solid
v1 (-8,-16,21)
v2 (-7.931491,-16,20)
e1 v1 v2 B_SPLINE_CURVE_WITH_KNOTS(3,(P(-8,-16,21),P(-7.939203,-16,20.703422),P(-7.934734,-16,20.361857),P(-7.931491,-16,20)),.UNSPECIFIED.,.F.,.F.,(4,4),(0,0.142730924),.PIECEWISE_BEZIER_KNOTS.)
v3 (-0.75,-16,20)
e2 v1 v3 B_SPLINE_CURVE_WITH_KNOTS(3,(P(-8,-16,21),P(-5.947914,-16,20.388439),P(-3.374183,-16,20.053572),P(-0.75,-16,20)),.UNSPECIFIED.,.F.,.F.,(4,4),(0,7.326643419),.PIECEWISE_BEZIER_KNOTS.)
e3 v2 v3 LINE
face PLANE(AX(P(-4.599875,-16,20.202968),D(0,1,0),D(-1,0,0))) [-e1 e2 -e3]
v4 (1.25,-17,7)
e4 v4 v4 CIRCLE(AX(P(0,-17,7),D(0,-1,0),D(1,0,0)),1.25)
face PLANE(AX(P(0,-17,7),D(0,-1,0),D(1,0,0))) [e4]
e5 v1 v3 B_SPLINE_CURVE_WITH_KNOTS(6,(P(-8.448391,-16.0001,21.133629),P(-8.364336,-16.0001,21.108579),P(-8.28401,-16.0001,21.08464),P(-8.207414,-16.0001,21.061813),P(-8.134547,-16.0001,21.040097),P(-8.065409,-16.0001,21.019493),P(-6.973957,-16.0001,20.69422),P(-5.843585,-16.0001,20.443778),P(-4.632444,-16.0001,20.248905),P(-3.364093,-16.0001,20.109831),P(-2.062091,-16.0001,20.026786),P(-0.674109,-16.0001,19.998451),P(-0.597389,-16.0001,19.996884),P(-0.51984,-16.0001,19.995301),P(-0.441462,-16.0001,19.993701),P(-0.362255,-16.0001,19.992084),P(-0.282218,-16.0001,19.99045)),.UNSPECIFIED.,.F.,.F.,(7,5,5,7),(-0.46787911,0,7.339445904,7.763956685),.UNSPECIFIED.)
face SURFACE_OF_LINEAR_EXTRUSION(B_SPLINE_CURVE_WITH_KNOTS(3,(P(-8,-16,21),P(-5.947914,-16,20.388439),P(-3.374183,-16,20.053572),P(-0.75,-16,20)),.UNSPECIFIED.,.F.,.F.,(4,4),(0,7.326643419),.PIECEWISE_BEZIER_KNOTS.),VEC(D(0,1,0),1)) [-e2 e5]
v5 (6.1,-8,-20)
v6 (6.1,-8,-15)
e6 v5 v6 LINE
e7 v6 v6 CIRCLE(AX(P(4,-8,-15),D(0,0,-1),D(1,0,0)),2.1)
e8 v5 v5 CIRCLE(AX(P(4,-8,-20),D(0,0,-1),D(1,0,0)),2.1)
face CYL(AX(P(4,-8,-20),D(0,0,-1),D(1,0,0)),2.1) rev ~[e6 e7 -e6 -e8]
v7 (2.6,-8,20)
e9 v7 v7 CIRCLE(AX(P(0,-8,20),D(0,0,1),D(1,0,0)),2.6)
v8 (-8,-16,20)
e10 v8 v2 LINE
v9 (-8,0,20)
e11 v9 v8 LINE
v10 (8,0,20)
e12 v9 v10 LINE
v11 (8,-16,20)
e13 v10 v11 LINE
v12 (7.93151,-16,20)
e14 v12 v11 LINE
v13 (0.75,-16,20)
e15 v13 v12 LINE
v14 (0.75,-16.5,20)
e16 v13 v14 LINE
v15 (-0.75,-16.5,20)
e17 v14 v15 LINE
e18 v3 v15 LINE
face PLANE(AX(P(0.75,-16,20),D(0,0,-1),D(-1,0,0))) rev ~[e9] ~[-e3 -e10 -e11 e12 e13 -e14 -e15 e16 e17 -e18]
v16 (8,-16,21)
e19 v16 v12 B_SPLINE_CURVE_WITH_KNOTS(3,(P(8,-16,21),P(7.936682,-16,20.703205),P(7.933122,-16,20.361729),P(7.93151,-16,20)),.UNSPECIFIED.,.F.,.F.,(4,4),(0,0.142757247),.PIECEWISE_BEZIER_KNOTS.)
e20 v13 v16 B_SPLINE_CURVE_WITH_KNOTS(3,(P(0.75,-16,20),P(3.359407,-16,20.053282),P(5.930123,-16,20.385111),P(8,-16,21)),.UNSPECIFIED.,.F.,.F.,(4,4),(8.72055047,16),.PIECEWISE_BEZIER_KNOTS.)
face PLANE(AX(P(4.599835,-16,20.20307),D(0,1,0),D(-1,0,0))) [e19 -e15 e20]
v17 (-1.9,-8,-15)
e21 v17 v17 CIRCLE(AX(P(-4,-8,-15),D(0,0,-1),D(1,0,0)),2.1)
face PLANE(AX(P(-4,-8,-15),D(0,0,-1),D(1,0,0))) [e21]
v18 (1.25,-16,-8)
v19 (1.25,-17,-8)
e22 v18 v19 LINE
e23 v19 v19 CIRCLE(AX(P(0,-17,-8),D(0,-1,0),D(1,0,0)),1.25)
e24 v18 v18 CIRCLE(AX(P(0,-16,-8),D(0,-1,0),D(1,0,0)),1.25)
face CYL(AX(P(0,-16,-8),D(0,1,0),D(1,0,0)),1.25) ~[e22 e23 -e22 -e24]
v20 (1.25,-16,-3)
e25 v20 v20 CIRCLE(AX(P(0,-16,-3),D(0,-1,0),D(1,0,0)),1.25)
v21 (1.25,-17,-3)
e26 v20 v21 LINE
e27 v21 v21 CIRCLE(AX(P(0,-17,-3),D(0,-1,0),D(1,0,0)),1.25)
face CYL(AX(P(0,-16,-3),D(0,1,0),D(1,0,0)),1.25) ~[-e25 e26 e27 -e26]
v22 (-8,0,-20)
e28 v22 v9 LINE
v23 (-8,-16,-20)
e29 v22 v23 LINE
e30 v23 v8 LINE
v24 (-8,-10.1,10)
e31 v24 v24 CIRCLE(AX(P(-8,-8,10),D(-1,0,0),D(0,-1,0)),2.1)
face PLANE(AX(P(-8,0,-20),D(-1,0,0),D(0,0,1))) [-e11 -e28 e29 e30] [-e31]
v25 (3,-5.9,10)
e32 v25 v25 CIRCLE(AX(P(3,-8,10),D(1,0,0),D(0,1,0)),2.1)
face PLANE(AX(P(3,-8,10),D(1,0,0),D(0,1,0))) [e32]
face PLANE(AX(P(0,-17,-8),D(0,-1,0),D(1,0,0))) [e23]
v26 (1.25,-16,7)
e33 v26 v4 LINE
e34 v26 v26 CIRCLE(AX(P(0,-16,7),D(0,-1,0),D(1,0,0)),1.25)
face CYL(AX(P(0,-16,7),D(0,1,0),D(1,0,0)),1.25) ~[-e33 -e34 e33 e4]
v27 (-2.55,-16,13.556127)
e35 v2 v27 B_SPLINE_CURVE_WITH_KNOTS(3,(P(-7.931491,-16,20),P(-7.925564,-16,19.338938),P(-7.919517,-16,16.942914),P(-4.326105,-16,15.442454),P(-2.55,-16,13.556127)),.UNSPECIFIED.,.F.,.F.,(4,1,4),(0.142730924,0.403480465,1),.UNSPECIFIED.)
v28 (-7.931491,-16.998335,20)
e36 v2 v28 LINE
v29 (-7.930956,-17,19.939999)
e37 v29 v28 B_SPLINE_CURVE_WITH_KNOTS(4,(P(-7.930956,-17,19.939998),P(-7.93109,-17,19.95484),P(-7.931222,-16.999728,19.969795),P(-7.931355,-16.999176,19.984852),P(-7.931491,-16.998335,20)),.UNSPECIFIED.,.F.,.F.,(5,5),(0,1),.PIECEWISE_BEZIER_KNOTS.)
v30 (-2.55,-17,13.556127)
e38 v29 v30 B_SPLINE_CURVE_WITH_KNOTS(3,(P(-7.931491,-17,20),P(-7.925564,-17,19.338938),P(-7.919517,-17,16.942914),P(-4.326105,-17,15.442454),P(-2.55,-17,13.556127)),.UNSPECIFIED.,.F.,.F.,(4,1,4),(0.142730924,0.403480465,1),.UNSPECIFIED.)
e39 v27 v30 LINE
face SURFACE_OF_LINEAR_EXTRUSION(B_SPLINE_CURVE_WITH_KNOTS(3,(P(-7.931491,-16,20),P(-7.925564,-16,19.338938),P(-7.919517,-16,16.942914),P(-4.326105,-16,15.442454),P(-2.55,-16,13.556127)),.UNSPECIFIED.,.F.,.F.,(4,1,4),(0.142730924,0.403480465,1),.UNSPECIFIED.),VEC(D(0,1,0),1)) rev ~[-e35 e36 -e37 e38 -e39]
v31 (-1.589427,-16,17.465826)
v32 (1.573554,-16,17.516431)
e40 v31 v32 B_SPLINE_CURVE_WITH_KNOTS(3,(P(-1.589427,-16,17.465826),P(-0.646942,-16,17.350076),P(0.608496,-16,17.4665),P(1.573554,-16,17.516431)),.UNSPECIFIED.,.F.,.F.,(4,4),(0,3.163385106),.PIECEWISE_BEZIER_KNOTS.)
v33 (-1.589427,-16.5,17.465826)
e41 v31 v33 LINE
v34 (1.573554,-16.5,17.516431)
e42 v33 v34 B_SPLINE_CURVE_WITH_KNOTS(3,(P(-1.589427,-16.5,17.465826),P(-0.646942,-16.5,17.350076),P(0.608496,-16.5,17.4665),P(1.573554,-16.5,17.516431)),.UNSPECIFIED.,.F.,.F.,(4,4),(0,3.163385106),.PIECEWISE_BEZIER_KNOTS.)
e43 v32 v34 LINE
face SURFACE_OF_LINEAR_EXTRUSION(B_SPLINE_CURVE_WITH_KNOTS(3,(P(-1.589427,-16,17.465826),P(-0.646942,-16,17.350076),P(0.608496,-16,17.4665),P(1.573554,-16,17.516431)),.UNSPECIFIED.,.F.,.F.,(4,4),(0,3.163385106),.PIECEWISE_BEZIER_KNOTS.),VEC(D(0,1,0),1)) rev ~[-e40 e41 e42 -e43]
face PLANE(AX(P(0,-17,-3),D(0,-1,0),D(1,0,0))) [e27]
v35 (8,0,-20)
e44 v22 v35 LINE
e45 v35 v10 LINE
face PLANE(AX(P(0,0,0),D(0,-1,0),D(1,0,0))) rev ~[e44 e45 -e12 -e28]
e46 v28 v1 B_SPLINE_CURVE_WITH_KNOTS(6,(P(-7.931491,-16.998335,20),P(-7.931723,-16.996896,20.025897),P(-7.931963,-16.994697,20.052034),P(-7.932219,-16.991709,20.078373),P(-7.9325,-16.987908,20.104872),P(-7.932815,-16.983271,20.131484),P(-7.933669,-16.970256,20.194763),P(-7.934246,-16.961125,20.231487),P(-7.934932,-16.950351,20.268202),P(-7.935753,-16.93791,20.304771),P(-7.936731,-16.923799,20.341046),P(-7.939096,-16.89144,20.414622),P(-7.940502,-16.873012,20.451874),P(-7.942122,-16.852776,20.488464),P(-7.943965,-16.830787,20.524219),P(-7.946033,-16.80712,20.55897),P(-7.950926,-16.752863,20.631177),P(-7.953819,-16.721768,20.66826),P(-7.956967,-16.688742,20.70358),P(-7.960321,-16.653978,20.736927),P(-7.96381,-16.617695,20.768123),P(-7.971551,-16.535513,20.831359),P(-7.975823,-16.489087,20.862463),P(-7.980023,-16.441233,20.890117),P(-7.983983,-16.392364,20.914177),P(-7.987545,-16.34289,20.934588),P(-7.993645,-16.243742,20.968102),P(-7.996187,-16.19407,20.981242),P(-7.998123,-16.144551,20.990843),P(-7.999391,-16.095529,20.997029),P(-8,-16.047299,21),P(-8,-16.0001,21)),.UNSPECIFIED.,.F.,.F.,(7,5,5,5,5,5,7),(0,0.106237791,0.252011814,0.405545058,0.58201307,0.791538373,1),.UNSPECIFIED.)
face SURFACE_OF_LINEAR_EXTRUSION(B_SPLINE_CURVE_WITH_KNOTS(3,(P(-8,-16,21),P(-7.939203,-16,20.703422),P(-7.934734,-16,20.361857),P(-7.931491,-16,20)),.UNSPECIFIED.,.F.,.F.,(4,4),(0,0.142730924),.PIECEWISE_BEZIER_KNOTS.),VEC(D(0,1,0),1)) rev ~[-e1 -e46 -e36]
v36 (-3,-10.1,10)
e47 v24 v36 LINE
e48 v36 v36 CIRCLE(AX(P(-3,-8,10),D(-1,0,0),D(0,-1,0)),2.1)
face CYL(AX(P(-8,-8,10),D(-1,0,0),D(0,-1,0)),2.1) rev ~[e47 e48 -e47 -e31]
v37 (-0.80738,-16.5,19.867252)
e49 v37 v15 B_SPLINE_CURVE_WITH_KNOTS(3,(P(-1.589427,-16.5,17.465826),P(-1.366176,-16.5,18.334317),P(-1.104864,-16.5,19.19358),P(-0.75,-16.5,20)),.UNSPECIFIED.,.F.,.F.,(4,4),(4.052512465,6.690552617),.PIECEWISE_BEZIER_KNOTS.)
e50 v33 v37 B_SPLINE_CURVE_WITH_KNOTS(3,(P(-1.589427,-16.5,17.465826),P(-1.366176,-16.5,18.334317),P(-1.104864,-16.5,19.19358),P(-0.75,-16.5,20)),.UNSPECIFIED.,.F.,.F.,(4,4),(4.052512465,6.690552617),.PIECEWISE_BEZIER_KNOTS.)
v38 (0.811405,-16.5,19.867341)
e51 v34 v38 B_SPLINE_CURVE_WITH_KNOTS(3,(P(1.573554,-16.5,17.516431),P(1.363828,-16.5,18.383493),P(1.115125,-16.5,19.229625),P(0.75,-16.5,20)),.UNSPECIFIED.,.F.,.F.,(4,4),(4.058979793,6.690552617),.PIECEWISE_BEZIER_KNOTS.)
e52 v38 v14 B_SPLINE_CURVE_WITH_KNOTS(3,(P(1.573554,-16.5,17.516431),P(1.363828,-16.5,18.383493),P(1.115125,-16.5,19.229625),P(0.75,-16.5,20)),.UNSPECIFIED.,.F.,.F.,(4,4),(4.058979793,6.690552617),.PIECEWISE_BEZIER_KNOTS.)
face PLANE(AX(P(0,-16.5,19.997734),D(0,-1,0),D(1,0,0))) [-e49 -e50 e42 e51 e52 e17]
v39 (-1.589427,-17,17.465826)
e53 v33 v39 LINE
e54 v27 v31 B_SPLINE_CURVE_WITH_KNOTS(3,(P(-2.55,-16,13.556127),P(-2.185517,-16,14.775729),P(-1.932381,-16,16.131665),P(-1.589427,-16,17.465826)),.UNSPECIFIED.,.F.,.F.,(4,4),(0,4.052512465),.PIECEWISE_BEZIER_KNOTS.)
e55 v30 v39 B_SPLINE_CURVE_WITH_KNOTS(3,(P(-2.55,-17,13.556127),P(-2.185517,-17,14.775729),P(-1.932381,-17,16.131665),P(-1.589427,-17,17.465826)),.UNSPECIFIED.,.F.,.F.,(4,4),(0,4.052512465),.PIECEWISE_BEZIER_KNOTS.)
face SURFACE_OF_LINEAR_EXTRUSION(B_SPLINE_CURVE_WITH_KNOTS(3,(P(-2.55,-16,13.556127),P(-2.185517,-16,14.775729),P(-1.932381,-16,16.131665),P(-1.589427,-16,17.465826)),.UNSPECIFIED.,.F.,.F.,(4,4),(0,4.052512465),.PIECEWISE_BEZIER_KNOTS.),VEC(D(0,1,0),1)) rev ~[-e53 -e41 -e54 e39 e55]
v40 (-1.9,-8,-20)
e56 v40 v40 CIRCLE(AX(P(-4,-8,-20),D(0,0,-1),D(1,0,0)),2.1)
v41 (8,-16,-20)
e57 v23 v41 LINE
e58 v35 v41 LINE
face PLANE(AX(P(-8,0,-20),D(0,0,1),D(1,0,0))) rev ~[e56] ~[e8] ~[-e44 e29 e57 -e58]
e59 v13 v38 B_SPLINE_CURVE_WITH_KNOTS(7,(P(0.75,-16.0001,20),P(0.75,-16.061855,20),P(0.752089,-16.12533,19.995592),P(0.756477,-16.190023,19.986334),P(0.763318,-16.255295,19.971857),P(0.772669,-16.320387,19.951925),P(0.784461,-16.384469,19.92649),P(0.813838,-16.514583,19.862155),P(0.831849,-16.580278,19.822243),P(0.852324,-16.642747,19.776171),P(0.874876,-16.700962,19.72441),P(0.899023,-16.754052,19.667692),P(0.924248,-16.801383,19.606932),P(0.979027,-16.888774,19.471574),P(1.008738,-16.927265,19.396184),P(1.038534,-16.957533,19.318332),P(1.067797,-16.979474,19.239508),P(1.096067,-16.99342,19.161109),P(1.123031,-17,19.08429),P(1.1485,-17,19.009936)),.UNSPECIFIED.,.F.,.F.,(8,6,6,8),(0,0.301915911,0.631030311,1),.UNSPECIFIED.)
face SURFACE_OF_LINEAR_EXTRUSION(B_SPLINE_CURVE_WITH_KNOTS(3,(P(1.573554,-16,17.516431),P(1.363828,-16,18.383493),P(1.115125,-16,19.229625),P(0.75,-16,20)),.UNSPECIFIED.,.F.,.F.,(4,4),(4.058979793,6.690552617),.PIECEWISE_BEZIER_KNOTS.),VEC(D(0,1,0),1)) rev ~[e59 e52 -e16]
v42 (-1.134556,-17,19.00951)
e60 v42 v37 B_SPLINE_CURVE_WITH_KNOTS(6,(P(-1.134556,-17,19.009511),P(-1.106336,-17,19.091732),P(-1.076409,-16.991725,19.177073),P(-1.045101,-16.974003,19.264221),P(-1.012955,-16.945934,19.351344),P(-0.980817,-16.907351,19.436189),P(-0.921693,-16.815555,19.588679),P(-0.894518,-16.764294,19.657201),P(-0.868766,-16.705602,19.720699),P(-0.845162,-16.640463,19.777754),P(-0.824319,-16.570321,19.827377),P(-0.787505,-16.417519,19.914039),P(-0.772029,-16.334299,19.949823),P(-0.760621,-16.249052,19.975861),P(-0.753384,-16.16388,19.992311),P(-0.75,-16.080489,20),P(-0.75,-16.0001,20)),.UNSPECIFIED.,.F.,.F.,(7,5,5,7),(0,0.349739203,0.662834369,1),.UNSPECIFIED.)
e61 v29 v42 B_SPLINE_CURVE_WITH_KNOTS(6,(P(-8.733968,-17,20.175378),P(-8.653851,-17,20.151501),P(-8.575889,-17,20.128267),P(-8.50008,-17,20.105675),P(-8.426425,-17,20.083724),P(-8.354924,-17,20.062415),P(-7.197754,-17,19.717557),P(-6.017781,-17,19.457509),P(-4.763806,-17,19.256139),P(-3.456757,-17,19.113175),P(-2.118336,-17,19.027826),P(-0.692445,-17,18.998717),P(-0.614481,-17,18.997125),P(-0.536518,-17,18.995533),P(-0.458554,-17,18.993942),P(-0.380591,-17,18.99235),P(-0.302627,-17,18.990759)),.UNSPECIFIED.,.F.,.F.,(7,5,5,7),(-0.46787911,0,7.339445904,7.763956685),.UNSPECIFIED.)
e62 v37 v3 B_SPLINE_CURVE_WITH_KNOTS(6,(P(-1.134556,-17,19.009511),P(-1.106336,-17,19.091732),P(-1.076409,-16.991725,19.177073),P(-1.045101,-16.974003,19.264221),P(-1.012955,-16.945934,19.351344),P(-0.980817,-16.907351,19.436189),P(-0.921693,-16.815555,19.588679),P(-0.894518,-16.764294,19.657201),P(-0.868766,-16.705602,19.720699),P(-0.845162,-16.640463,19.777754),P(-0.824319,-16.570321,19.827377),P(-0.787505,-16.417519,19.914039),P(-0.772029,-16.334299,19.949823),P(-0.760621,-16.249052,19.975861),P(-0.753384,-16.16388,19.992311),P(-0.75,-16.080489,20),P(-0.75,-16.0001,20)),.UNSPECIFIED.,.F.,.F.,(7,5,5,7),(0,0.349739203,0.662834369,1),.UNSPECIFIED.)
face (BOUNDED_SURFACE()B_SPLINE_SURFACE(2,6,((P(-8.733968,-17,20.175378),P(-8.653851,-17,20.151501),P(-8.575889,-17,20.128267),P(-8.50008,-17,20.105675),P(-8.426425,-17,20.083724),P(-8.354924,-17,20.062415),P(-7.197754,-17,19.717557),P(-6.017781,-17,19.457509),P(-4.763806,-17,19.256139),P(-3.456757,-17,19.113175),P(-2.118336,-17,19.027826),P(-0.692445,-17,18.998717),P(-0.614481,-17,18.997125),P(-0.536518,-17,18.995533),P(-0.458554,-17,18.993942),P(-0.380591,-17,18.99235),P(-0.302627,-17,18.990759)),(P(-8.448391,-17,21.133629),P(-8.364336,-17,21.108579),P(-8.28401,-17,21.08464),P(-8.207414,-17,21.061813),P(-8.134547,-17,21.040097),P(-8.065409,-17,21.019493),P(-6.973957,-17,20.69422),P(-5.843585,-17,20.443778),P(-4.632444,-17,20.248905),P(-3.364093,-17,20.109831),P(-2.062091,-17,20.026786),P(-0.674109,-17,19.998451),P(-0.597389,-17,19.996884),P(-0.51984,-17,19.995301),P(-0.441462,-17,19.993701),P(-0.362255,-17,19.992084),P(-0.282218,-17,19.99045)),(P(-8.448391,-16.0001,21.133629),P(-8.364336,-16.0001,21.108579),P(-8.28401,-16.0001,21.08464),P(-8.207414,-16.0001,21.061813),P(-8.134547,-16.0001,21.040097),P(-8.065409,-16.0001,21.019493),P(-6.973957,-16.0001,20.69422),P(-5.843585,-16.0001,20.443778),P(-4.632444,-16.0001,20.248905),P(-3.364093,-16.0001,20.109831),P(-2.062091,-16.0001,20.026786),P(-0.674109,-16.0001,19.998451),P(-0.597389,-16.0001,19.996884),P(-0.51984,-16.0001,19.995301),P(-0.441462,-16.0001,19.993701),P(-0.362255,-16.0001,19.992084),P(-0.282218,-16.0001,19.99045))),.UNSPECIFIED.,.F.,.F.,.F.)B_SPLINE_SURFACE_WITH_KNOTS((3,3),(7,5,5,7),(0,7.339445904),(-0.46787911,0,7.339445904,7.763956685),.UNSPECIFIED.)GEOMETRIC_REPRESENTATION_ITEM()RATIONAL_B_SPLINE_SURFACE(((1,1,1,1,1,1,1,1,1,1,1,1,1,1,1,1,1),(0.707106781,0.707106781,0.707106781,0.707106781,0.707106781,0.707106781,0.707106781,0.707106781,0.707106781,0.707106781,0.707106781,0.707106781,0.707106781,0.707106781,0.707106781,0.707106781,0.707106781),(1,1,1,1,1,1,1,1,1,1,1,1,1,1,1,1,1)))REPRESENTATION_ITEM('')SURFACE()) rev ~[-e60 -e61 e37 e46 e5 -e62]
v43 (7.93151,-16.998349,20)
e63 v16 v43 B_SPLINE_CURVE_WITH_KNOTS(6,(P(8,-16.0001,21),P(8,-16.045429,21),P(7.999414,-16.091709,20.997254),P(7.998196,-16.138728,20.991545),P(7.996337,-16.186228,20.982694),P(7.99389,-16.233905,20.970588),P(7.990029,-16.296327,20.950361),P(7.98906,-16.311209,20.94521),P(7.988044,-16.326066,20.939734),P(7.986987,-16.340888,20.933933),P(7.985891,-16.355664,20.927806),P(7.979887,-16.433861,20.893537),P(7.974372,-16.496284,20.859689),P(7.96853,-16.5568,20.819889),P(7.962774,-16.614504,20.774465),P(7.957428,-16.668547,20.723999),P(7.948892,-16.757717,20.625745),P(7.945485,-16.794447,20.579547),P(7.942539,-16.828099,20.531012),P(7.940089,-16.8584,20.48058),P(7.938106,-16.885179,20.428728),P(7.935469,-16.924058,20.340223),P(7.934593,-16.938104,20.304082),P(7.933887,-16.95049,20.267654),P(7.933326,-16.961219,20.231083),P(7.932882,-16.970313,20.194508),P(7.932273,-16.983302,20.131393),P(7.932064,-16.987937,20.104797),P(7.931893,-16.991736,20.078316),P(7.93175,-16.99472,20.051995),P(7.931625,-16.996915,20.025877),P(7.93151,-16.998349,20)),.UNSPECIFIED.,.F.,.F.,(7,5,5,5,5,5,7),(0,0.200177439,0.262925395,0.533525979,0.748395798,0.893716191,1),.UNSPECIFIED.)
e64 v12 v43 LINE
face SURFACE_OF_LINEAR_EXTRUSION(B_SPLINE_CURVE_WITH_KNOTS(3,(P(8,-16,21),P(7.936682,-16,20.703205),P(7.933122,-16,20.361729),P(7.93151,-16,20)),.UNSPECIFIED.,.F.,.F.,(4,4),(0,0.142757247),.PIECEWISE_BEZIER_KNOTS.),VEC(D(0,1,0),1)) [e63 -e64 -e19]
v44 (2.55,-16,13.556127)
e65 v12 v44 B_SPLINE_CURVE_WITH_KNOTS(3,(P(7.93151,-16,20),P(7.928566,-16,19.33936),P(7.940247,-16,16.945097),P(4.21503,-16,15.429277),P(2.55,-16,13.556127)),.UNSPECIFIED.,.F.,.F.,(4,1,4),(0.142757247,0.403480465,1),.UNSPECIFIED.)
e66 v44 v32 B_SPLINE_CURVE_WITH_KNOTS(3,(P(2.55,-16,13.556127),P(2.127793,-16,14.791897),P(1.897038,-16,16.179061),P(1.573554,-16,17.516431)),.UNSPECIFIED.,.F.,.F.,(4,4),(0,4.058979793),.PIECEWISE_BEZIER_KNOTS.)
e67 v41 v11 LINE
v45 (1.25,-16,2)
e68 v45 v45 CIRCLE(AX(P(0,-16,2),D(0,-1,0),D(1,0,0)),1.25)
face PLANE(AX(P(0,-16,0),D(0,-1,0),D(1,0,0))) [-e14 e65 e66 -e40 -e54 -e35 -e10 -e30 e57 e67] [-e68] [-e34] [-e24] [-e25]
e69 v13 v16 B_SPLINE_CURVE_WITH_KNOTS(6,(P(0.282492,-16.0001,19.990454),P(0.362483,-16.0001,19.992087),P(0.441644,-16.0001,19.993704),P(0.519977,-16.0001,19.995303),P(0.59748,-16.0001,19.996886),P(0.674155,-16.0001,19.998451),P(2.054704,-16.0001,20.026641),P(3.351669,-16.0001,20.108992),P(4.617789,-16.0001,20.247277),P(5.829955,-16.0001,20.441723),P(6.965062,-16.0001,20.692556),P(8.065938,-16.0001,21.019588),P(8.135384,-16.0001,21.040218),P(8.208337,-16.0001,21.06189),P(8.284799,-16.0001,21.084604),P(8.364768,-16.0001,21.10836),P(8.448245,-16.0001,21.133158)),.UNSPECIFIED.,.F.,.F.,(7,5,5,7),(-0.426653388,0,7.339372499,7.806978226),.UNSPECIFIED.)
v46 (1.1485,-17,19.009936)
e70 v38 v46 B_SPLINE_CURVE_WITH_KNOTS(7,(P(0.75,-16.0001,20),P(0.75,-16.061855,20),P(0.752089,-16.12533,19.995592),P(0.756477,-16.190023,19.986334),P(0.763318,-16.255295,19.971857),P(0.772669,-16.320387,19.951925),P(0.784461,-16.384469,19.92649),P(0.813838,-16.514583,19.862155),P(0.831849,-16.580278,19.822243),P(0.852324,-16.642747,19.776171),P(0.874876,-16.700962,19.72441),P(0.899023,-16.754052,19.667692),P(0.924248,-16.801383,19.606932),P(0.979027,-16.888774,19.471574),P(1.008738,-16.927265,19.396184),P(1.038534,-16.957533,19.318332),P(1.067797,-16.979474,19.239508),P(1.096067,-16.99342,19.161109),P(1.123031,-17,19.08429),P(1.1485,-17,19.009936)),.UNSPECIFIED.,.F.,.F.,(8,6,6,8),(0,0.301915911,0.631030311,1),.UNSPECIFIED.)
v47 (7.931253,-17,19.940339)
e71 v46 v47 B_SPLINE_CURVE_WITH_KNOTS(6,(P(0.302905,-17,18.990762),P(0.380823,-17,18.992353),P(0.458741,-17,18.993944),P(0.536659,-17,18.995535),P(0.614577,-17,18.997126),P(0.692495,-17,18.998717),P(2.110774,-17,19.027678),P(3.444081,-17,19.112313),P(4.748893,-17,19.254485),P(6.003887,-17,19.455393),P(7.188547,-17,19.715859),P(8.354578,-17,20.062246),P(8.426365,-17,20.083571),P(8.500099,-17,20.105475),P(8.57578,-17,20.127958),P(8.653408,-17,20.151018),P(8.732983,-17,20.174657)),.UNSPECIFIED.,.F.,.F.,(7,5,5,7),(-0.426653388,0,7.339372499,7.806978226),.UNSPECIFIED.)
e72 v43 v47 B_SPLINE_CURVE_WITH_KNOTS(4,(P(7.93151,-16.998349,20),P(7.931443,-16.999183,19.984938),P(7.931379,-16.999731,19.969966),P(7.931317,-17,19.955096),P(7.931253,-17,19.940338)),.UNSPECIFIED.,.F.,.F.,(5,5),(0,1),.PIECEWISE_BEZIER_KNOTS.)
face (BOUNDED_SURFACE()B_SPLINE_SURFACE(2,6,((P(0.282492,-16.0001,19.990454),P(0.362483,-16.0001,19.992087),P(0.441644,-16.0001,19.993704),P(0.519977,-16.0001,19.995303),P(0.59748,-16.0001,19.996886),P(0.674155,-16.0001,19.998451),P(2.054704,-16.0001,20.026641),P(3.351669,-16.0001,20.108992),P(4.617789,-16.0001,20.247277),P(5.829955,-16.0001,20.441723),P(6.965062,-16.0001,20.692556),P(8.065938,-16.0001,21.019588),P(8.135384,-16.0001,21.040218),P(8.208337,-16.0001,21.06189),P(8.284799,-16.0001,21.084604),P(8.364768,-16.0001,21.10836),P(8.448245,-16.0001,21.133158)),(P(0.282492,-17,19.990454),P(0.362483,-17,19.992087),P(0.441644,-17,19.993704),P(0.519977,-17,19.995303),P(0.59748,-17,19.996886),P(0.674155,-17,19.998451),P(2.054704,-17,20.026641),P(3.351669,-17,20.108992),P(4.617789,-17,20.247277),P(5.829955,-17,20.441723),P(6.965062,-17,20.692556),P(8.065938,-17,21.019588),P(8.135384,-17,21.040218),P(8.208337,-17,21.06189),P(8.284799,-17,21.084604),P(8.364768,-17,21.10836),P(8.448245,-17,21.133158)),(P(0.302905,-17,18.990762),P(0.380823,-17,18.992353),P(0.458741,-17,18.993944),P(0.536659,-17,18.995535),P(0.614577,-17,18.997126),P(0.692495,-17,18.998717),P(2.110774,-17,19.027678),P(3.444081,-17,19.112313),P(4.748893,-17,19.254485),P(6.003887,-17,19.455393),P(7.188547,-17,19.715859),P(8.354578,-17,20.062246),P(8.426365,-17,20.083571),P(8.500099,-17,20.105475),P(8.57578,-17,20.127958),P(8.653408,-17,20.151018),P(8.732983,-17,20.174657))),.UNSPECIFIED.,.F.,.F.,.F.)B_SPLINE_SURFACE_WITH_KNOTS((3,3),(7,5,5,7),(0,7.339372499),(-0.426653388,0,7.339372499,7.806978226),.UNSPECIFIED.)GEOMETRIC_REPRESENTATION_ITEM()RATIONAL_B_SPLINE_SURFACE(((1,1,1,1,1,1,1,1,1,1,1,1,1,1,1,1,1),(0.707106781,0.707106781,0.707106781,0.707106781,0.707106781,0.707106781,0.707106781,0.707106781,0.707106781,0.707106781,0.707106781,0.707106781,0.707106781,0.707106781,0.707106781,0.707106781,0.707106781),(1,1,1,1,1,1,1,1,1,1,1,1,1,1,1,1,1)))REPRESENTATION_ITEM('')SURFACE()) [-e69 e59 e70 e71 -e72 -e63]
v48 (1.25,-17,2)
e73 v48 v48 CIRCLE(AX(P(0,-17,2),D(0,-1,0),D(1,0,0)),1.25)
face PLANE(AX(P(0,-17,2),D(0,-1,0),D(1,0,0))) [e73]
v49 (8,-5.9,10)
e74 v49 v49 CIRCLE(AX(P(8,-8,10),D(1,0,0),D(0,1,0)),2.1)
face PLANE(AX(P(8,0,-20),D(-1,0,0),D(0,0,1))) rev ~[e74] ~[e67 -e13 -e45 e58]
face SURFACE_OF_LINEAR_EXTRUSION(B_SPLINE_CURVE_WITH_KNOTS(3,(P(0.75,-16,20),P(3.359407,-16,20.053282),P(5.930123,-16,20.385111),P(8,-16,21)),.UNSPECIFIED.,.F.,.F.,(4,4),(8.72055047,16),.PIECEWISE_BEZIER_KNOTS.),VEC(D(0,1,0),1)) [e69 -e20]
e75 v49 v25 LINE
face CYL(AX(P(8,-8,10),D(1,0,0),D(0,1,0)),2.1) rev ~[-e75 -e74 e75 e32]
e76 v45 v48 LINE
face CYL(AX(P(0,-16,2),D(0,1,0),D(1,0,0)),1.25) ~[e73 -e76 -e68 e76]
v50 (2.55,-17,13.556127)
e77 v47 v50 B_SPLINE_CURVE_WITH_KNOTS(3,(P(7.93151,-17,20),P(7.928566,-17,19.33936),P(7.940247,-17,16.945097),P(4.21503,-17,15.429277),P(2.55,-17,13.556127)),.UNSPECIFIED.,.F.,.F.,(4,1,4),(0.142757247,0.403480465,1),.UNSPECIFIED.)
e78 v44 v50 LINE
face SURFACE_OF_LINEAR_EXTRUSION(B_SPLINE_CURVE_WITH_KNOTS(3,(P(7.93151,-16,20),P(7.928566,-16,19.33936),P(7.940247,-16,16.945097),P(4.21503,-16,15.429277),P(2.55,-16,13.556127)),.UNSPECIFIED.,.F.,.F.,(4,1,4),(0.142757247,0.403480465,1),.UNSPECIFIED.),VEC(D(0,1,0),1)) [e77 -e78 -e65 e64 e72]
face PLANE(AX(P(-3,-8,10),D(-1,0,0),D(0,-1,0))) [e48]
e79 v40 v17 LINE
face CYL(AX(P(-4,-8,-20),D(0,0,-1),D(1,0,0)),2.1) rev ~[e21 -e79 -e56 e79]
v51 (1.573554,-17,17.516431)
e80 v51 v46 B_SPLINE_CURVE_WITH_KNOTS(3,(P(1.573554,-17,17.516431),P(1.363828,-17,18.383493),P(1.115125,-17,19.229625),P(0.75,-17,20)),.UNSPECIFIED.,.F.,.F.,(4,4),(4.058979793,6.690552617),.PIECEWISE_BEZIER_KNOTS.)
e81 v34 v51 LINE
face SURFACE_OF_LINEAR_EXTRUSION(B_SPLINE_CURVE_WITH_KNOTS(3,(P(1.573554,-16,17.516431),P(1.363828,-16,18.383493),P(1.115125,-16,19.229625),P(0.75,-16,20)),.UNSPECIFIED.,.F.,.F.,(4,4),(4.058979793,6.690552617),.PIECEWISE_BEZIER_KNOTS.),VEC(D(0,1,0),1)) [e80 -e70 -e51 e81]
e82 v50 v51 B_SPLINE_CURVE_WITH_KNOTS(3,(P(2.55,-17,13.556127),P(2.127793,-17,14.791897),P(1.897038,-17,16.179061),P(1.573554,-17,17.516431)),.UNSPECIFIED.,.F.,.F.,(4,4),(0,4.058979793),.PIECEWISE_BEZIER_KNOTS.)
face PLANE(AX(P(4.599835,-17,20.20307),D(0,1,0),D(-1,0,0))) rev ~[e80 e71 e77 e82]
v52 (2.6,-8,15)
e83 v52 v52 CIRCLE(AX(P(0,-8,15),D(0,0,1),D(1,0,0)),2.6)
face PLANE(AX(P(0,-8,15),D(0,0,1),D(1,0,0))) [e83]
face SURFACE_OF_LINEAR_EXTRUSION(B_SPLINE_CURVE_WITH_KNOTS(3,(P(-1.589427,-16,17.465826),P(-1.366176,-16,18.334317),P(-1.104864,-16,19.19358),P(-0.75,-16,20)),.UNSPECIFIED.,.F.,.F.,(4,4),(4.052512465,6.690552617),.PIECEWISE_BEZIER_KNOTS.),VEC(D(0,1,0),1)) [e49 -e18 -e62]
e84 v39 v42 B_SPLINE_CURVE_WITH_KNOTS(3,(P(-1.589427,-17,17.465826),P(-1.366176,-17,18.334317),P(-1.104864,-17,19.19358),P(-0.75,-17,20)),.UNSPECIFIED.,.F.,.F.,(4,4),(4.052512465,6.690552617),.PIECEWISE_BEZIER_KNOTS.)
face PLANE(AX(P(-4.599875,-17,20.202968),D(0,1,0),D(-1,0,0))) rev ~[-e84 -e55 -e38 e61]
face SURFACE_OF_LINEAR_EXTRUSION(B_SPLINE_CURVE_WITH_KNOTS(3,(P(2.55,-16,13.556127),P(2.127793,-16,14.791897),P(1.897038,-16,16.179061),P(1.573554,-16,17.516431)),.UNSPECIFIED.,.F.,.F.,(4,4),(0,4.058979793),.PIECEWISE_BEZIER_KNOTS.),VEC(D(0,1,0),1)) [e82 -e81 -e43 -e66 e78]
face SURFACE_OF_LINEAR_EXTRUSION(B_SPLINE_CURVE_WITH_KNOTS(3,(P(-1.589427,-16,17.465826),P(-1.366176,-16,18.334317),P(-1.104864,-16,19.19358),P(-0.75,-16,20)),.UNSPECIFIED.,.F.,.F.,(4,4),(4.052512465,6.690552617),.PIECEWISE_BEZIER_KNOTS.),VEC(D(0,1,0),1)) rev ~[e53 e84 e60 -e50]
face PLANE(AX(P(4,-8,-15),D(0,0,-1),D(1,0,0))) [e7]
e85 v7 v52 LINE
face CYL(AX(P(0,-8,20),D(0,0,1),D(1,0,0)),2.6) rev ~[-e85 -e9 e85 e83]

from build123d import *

# Parameters (mm, degrees)
F0_W      = 16
F0_H      = 40
F1_DEPTH  = 16
F2_R      = 2.6
F3_DEPTH  = 5
F4_R      = 2.1
F5_DEPTH  = 5
F6_R      = 2.1
F7_DEPTH  = 5
F8_R      = 2.1
F9_DEPTH  = 5
F10_R     = 2.1
F11_DEPTH = 5
F12_R     = 1.25
F13_DEPTH = 1
F14_R     = 1.25
F15_DEPTH = 1
F16_R     = 1.25
F17_DEPTH = 1
F18_R     = 1.25
F19_DEPTH = 1
F21_DEPTH = 1
F22_R     = 0.9999
F23_DEPTH = 0.5


# Not quite as in the source:
# - a fillet or chamfer is up to 0.001 mm smaller than in the source, because OpenCascade refuses the exact size


with BuildPart() as f1:
    # F0 (on Front) → F1 (new body)
    with BuildSketch(Plane.XZ):
        Rectangle(F0_W, F0_H)
    extrude(amount=F1_DEPTH)

    # F2 (on face) → F3 (cut)
    with BuildSketch(Plane.XY.offset(20)):
        with Locations((0, -8)):
            Circle(F2_R)
    extrude(amount=-F3_DEPTH, mode=Mode.SUBTRACT)

    # F4 (on face) → F5 (cut)
    with BuildSketch(Plane.YZ.offset(8)):
        with Locations((-8, 10)):
            Circle(F4_R)
    extrude(amount=-F5_DEPTH, mode=Mode.SUBTRACT)

    # F6 (on face) → F7 (cut)
    with BuildSketch(Plane(origin=(-8, 0, 0), x_dir=(0, -1, 0), z_dir=(-1, 0, 0))):
        with Locations((8, 10)):
            Circle(F6_R)
    extrude(amount=-F7_DEPTH, mode=Mode.SUBTRACT)

    # F8 (on face) → F9 (cut)
    with BuildSketch(Plane(origin=(0, 0, -20), x_dir=(1, 0, 0), z_dir=(0, 0, -1))):
        with Locations((4, 8)):
            Circle(F8_R)
    extrude(amount=-F9_DEPTH, mode=Mode.SUBTRACT)

    # F10 (on face) → F11 (cut)
    with BuildSketch(Plane(origin=(0, 0, -20), x_dir=(1, 0, 0), z_dir=(0, 0, -1))):
        with Locations((-4, 8)):
            Circle(F10_R)
    extrude(amount=-F11_DEPTH, mode=Mode.SUBTRACT)

    # F12 (on face) → F13 (join)
    with BuildSketch(Plane.XZ.offset(16)):
        with Locations((0, 7)):
            Circle(F12_R)
    extrude(amount=F13_DEPTH)

    # F14 (on face) → F15 (join)
    with BuildSketch(Plane.XZ.offset(16)):
        with Locations((0, 2)):
            Circle(F14_R)
    extrude(amount=F15_DEPTH)

    # F16 (on face) → F17 (join)
    with BuildSketch(Plane.XZ.offset(16)):
        with Locations((0, -3)):
            Circle(F16_R)
    extrude(amount=F17_DEPTH)

    # F18 (on face) → F19 (join)
    with BuildSketch(Plane.XZ.offset(16)):
        with Locations((0, -8)):
            Circle(F18_R)
    extrude(amount=F19_DEPTH)

    # F20 (on face) → F21 (join)
    with BuildSketch(Plane.XZ.offset(16)):
        with BuildLine():
            add(Edge.make_bspline(
                [(0.75, 20), (3.3594071533, 20.0532824127), (5.9301231166, 20.3851114773), (8, 21)],
                knots=[8.72055047, 8.72055047, 8.72055047, 8.72055047, 16, 16, 16, 16], degree=3))
            Line((0.75, 20), (7.9315101276, 20))
            add(Edge.make_bspline(
                [(8, 21), (7.936682093, 20.7032053334), (7.9331222274, 20.3617292136), (7.9315101276, 20)],
                knots=[0, 0, 0, 0, 0.1427572475, 0.1427572475, 0.1427572475, 0.1427572475], degree=3))
        make_face()
        with BuildLine():
            add(Edge.make_bspline(
                [(-8, 21), (-5.9479143878, 20.3884393869), (-3.3741827757, 20.0535723375), (-0.75, 20)],
                knots=[0, 0, 0, 0, 7.3266434187, 7.3266434187, 7.3266434187, 7.3266434187], degree=3))
            add(Edge.make_bspline(
                [(-8, 21), (-7.9392027192, 20.7034220667), (-7.9347343847, 20.3618566303), (-7.9314905291, 20)],
                knots=[0, 0, 0, 0, 0.1427309242, 0.1427309242, 0.1427309242, 0.1427309242], degree=3))
            Line((-7.9314905291, 20), (-0.75, 20))
        make_face()
        with BuildLine():
            Line((7.9315101276, 20), (0.75, 20))
            add(Edge.make_bspline(
                [(1.5735535475, 17.5164310059), (1.3638279631, 18.3834931797), (1.1151249806, 19.2296253371), (0.75, 20)],
                knots=[4.0589797926, 4.0589797926, 4.0589797926, 4.0589797926, 6.690552617, 6.690552617, 6.690552617, 6.690552617], degree=3))
            add(Edge.make_bspline(
                [(2.55, 13.5561273817), (2.1277926475, 14.7918965335), (1.8970376255, 16.1790605143), (1.5735535475, 17.5164310059)],
                knots=[0, 0, 0, 0, 4.0589797926, 4.0589797926, 4.0589797926, 4.0589797926], degree=3))
            add(Edge.make_bspline(
                [(7.9315101276, 20), (7.9285658859, 19.3393596044), (7.9402465057, 16.9450971177), (4.2150295862, 15.4292771095), (2.55, 13.5561273817)],
                knots=[0.1427572475, 0.1427572475, 0.1427572475, 0.1427572475, 0.4034804652, 1, 1, 1, 1], degree=3))
        make_face()
        with BuildLine():
            add(Edge.make_bspline(
                [(-1.5894267657, 17.4658260078), (-1.3661758267, 18.3343166755), (-1.104863981, 19.193579629), (-0.75, 20)],
                knots=[4.0525124649, 4.0525124649, 4.0525124649, 4.0525124649, 6.690552617, 6.690552617, 6.690552617, 6.690552617], degree=3))
            Line((-0.75, 20), (-7.9314905291, 20))
            add(Edge.make_bspline(
                [(-7.9314905291, 20), (-7.9255644562, 19.3389382799), (-7.9195168056, 16.9429139448), (-4.3261046571, 15.4424536286), (-2.55, 13.5561273817)],
                knots=[0.1427309242, 0.1427309242, 0.1427309242, 0.1427309242, 0.4034804652, 1, 1, 1, 1], degree=3))
            add(Edge.make_bspline(
                [(-2.55, 13.5561273817), (-2.185517021, 14.7757286924), (-1.9323810655, 16.1316653987), (-1.5894267657, 17.4658260078)],
                knots=[0, 0, 0, 0, 4.0525124649, 4.0525124649, 4.0525124649, 4.0525124649], degree=3))
        make_face()
    extrude(amount=F21_DEPTH)

    # F22 (radius 1 in the source; OpenCascade refuses exactly that, so slightly less here)
    f22_edges = [f1.edges().sort_by_distance(p)[0] for p in [
        (4.408175, -17, 20.266958),
        (-4.589536, -17, 20.290754),
    ]]
    fillet(f22_edges, radius=F22_R)

    # F20 (on face) → F23 (join)
    with BuildSketch(Plane.XZ.offset(16)):
        with BuildLine():
            Line((0.75, 20), (-0.75, 20))
            add(Edge.make_bspline(
                [(-0.75, 20), (-0.2507445203, 19.9898077667), (0.2503370769, 19.9897972051), (0.75, 20)],
                knots=[7.3266434187, 7.3266434187, 7.3266434187, 7.3266434187, 8.72055047, 8.72055047, 8.72055047, 8.72055047], degree=3))
        make_face()
        with BuildLine():
            add(Edge.make_bspline(
                [(-0.75, 20), (-0.2507445203, 19.9898077667), (0.2503370769, 19.9897972051), (0.75, 20)],
                knots=[7.3266434187, 7.3266434187, 7.3266434187, 7.3266434187, 8.72055047, 8.72055047, 8.72055047, 8.72055047], degree=3))
            add(Edge.make_bspline(
                [(-1.5894267657, 17.4658260078), (-1.3661758267, 18.3343166755), (-1.104863981, 19.193579629), (-0.75, 20)],
                knots=[4.0525124649, 4.0525124649, 4.0525124649, 4.0525124649, 6.690552617, 6.690552617, 6.690552617, 6.690552617], degree=3))
            add(Edge.make_bspline(
                [(-1.5894267657, 17.4658260078), (-0.646941675, 17.3500761834), (0.6084956384, 17.4665004575), (1.5735535475, 17.5164310059)],
                knots=[0, 0, 0, 0, 3.1633851058, 3.1633851058, 3.1633851058, 3.1633851058], degree=3))
            add(Edge.make_bspline(
                [(1.5735535475, 17.5164310059), (1.3638279631, 18.3834931797), (1.1151249806, 19.2296253371), (0.75, 20)],
                knots=[4.0589797926, 4.0589797926, 4.0589797926, 4.0589797926, 6.690552617, 6.690552617, 6.690552617, 6.690552617], degree=3))
        make_face()
    extrude(amount=F23_DEPTH)


solid = f1.part
